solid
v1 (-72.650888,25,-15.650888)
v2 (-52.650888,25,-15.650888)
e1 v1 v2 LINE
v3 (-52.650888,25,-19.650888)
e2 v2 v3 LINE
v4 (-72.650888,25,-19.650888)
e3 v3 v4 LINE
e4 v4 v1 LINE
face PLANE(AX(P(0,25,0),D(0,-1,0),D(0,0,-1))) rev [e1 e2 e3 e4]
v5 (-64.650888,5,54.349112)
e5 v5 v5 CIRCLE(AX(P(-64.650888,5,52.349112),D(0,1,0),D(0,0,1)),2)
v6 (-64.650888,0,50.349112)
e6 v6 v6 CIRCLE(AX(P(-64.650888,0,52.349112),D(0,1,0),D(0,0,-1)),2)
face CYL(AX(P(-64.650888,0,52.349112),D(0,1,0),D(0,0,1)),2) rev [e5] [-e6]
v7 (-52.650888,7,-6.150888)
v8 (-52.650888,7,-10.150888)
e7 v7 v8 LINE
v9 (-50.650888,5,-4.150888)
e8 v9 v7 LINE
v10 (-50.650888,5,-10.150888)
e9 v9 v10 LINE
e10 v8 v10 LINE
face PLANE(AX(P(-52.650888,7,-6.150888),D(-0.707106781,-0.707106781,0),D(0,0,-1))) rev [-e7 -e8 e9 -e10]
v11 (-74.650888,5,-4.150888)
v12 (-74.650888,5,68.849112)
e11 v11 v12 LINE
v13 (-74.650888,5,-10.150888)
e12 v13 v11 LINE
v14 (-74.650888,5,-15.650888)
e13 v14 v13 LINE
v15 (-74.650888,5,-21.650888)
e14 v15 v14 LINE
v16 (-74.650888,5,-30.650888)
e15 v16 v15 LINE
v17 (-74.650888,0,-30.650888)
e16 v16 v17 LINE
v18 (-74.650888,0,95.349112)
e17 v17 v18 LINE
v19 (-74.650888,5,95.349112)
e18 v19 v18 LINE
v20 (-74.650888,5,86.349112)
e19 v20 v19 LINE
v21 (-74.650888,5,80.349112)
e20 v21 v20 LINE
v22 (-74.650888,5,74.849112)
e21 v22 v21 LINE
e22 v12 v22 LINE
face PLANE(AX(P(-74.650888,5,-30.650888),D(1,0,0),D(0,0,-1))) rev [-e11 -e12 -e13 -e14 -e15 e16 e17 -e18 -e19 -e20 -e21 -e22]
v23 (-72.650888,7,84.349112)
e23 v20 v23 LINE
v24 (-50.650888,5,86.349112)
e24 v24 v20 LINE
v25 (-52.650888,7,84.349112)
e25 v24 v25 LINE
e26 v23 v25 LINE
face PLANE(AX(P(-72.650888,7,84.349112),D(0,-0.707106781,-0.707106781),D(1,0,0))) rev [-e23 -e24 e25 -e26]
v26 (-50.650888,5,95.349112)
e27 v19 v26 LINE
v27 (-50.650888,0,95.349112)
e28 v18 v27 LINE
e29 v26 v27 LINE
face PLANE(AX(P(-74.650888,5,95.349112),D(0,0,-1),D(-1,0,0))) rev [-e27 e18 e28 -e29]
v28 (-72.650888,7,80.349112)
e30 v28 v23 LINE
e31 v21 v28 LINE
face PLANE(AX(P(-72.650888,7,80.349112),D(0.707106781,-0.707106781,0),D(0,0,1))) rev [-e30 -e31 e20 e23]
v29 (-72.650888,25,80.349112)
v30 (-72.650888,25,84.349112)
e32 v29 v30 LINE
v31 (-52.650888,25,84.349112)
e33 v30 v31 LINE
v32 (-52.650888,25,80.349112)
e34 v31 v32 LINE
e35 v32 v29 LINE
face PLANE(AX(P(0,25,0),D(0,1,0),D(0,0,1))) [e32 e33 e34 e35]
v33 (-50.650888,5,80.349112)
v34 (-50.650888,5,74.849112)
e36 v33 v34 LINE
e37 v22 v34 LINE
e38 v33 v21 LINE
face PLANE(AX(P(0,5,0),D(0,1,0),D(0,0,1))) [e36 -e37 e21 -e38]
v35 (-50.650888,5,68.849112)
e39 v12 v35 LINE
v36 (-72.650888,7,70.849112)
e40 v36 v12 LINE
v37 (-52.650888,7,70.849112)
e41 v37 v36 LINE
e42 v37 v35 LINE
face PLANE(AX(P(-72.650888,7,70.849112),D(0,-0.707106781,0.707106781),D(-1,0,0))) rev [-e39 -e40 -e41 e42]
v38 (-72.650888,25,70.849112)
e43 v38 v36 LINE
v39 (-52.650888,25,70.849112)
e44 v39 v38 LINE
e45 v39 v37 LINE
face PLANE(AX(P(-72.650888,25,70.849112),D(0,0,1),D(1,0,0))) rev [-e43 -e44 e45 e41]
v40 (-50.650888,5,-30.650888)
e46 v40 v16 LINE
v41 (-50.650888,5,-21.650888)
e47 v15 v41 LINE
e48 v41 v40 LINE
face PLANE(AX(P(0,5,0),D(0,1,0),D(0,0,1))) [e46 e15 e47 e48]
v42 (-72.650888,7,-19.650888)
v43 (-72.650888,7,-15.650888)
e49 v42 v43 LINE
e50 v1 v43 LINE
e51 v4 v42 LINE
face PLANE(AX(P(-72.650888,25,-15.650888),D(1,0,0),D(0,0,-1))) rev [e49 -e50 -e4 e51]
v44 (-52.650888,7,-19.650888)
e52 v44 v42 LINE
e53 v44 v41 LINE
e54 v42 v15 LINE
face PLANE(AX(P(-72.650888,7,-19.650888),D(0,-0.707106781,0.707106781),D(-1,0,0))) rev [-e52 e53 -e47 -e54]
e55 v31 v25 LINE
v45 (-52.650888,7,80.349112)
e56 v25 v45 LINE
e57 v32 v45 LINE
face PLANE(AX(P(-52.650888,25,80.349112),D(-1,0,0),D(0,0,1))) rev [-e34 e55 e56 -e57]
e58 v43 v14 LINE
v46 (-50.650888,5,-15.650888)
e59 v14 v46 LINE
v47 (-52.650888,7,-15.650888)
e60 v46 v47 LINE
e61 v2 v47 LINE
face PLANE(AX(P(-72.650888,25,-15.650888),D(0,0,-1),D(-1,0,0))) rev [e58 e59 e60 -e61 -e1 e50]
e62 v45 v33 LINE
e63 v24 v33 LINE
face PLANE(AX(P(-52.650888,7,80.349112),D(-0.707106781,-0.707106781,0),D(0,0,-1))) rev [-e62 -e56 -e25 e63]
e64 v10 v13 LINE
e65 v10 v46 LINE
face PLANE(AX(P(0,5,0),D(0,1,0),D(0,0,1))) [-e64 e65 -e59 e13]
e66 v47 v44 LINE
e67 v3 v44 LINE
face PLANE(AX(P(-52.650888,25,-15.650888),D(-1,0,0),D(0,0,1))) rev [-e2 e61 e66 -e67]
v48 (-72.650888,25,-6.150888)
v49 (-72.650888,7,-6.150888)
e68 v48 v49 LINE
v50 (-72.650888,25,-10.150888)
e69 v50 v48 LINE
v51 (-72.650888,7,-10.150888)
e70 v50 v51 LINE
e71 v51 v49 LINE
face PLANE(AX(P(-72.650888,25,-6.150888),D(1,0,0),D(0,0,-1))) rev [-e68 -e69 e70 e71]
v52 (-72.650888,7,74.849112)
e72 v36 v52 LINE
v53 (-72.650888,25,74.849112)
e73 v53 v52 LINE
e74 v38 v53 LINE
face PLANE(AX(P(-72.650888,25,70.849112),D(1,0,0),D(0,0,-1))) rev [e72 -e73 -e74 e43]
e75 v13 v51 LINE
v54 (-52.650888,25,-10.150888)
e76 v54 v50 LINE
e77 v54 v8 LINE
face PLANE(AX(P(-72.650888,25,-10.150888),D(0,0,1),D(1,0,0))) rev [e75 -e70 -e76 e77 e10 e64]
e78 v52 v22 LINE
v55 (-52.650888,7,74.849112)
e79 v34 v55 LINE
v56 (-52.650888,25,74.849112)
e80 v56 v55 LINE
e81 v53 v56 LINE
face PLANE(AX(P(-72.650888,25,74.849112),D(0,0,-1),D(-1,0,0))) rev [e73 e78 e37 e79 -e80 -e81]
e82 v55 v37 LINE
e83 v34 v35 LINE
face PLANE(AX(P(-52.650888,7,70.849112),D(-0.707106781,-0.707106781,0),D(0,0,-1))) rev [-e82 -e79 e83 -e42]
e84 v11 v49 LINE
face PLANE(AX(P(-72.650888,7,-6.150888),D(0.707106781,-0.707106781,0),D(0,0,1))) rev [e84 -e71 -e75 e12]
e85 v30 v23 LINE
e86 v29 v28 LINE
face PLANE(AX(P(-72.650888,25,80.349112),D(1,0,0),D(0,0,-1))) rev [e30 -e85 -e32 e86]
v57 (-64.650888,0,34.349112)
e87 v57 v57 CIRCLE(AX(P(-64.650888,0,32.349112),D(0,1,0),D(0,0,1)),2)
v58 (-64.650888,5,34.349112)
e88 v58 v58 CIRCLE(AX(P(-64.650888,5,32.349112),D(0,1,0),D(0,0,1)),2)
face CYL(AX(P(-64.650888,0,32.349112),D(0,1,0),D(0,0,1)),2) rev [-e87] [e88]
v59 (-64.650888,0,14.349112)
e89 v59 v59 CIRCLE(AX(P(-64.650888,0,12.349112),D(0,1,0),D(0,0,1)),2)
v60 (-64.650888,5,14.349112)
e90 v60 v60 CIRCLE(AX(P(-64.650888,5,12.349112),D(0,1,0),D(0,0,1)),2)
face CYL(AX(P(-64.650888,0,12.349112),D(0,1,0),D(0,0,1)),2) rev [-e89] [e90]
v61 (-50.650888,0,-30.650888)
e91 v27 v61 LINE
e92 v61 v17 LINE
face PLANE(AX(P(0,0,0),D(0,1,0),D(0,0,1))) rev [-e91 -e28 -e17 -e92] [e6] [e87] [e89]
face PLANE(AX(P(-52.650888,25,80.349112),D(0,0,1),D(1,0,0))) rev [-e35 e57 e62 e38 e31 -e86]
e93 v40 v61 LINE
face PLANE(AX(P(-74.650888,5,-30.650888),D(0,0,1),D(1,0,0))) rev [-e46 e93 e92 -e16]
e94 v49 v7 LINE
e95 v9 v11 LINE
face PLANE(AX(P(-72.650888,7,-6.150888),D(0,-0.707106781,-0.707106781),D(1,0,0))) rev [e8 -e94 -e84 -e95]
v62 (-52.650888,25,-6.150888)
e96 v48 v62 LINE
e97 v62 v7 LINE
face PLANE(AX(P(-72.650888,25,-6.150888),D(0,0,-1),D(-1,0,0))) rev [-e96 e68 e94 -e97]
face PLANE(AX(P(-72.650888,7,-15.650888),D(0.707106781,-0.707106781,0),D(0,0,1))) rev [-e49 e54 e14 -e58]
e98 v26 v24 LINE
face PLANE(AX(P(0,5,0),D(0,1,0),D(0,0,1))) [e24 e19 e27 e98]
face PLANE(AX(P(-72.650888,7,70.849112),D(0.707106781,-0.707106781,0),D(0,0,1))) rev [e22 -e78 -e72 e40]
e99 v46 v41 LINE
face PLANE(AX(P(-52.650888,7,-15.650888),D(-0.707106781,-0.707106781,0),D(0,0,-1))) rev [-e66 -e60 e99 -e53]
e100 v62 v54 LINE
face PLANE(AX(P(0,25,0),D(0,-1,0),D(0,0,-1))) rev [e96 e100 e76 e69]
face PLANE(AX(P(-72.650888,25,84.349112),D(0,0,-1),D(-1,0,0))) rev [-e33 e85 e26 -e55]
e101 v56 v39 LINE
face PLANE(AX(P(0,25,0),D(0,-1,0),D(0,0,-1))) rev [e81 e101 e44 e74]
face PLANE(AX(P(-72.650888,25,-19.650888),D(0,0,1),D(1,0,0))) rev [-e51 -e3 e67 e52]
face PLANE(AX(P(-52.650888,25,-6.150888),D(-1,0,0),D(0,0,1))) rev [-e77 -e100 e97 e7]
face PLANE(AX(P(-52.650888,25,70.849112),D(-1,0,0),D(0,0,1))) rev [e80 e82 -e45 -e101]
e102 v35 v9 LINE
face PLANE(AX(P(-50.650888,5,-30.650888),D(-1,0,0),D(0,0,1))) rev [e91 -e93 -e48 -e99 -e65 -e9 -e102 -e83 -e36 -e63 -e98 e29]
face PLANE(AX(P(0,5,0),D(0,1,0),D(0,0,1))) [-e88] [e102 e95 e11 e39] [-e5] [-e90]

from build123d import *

# Parameters (mm, degrees)
SKETCH1_W               = 24
SKETCH1_H               = 126
BOSS_EXTRUDE1_DEPTH     = 5
SKETCH2_W               = 20
SKETCH2_H               = 4
BOSS_EXTRUDE2_DEPTH     = 20
CUT_EXTRUDE1_DEPTH      = 123.736336331
CUT_EXTRUDE1_DEPTH_BACK = 123.736336331
SKETCH3_R               = 2
CHAMFER1_SIZE           = 2


with BuildPart() as part:
    # Sketch1 → Boss-Extrude1 (new body)
    with BuildSketch(Plane(origin=(0, 0, 0), x_dir=(1, 0, 0), z_dir=(0, 1, 0))):
        with Locations((-62.650887574, -32.349112426)):
            Rectangle(SKETCH1_W, SKETCH1_H)
    extrude(amount=BOSS_EXTRUDE1_DEPTH)

    # Sketch2 → Boss-Extrude2 (add)
    with BuildSketch(Plane(origin=(0, 5, 0), x_dir=(1, 0, 0), z_dir=(0, 1, 0))):
        with Locations((-62.650887574, 17.650887574)):
            Rectangle(SKETCH2_W, SKETCH2_H)
        with Locations((-62.650887574, 8.150887574)):
            Rectangle(SKETCH2_W, SKETCH2_H)
        with Locations((-62.650887574, -72.849112426)):
            Rectangle(SKETCH2_W, SKETCH2_H)
        with Locations((-62.650887574, -82.349112426)):
            Rectangle(SKETCH2_W, SKETCH2_H)
    extrude(amount=BOSS_EXTRUDE2_DEPTH)

    # Sketch3 → Cut-Extrude1 (cut, two sides: drawn at the far end of the back side and taken through both)
    with BuildSketch(Plane(origin=(0, 5, 0), x_dir=(1, 0, 0), z_dir=(0, 1, 0)).offset(-CUT_EXTRUDE1_DEPTH_BACK)):
        with Locations(Location((-64.650887574, -32.349112426, 0), (0, 0, 270))):
            Circle(SKETCH3_R)
        with Locations(Location((-64.650887574, -12.349112426, 0), (0, 0, 270))):
            Circle(SKETCH3_R)
        with Locations(Location((-64.650887574, -52.349112426, 0), (0, 0, 270))):
            Circle(SKETCH3_R)
    extrude(amount=CUT_EXTRUDE1_DEPTH + CUT_EXTRUDE1_DEPTH_BACK, mode=Mode.SUBTRACT)

    # Chamfer1
    chamfer1_edges = [part.edges().sort_by_distance(p)[0] for p in [
        (-72.650887574, 5, -17.650887574),
        (-52.650887574, 5, -17.650887574),
        (-62.650887574, 5, -19.650887574),
        (-72.650887574, 5, -8.150887574),
        (-62.650887574, 5, -6.150887574),
        (-52.650887574, 5, -8.150887574),
        (-72.650887574, 5, 82.349112426),
        (-62.650887574, 5, 84.349112426),
        (-52.650887574, 5, 82.349112426),
        (-62.650887574, 5, 70.849112426),
        (-72.650887574, 5, 72.849112426),
        (-52.650887574, 5, 72.849112426),
    ]]
    chamfer(chamfer1_edges, length=CHAMFER1_SIZE - 0.0001)  # a hair under: the kernel refuses the full size


solid = part.part
